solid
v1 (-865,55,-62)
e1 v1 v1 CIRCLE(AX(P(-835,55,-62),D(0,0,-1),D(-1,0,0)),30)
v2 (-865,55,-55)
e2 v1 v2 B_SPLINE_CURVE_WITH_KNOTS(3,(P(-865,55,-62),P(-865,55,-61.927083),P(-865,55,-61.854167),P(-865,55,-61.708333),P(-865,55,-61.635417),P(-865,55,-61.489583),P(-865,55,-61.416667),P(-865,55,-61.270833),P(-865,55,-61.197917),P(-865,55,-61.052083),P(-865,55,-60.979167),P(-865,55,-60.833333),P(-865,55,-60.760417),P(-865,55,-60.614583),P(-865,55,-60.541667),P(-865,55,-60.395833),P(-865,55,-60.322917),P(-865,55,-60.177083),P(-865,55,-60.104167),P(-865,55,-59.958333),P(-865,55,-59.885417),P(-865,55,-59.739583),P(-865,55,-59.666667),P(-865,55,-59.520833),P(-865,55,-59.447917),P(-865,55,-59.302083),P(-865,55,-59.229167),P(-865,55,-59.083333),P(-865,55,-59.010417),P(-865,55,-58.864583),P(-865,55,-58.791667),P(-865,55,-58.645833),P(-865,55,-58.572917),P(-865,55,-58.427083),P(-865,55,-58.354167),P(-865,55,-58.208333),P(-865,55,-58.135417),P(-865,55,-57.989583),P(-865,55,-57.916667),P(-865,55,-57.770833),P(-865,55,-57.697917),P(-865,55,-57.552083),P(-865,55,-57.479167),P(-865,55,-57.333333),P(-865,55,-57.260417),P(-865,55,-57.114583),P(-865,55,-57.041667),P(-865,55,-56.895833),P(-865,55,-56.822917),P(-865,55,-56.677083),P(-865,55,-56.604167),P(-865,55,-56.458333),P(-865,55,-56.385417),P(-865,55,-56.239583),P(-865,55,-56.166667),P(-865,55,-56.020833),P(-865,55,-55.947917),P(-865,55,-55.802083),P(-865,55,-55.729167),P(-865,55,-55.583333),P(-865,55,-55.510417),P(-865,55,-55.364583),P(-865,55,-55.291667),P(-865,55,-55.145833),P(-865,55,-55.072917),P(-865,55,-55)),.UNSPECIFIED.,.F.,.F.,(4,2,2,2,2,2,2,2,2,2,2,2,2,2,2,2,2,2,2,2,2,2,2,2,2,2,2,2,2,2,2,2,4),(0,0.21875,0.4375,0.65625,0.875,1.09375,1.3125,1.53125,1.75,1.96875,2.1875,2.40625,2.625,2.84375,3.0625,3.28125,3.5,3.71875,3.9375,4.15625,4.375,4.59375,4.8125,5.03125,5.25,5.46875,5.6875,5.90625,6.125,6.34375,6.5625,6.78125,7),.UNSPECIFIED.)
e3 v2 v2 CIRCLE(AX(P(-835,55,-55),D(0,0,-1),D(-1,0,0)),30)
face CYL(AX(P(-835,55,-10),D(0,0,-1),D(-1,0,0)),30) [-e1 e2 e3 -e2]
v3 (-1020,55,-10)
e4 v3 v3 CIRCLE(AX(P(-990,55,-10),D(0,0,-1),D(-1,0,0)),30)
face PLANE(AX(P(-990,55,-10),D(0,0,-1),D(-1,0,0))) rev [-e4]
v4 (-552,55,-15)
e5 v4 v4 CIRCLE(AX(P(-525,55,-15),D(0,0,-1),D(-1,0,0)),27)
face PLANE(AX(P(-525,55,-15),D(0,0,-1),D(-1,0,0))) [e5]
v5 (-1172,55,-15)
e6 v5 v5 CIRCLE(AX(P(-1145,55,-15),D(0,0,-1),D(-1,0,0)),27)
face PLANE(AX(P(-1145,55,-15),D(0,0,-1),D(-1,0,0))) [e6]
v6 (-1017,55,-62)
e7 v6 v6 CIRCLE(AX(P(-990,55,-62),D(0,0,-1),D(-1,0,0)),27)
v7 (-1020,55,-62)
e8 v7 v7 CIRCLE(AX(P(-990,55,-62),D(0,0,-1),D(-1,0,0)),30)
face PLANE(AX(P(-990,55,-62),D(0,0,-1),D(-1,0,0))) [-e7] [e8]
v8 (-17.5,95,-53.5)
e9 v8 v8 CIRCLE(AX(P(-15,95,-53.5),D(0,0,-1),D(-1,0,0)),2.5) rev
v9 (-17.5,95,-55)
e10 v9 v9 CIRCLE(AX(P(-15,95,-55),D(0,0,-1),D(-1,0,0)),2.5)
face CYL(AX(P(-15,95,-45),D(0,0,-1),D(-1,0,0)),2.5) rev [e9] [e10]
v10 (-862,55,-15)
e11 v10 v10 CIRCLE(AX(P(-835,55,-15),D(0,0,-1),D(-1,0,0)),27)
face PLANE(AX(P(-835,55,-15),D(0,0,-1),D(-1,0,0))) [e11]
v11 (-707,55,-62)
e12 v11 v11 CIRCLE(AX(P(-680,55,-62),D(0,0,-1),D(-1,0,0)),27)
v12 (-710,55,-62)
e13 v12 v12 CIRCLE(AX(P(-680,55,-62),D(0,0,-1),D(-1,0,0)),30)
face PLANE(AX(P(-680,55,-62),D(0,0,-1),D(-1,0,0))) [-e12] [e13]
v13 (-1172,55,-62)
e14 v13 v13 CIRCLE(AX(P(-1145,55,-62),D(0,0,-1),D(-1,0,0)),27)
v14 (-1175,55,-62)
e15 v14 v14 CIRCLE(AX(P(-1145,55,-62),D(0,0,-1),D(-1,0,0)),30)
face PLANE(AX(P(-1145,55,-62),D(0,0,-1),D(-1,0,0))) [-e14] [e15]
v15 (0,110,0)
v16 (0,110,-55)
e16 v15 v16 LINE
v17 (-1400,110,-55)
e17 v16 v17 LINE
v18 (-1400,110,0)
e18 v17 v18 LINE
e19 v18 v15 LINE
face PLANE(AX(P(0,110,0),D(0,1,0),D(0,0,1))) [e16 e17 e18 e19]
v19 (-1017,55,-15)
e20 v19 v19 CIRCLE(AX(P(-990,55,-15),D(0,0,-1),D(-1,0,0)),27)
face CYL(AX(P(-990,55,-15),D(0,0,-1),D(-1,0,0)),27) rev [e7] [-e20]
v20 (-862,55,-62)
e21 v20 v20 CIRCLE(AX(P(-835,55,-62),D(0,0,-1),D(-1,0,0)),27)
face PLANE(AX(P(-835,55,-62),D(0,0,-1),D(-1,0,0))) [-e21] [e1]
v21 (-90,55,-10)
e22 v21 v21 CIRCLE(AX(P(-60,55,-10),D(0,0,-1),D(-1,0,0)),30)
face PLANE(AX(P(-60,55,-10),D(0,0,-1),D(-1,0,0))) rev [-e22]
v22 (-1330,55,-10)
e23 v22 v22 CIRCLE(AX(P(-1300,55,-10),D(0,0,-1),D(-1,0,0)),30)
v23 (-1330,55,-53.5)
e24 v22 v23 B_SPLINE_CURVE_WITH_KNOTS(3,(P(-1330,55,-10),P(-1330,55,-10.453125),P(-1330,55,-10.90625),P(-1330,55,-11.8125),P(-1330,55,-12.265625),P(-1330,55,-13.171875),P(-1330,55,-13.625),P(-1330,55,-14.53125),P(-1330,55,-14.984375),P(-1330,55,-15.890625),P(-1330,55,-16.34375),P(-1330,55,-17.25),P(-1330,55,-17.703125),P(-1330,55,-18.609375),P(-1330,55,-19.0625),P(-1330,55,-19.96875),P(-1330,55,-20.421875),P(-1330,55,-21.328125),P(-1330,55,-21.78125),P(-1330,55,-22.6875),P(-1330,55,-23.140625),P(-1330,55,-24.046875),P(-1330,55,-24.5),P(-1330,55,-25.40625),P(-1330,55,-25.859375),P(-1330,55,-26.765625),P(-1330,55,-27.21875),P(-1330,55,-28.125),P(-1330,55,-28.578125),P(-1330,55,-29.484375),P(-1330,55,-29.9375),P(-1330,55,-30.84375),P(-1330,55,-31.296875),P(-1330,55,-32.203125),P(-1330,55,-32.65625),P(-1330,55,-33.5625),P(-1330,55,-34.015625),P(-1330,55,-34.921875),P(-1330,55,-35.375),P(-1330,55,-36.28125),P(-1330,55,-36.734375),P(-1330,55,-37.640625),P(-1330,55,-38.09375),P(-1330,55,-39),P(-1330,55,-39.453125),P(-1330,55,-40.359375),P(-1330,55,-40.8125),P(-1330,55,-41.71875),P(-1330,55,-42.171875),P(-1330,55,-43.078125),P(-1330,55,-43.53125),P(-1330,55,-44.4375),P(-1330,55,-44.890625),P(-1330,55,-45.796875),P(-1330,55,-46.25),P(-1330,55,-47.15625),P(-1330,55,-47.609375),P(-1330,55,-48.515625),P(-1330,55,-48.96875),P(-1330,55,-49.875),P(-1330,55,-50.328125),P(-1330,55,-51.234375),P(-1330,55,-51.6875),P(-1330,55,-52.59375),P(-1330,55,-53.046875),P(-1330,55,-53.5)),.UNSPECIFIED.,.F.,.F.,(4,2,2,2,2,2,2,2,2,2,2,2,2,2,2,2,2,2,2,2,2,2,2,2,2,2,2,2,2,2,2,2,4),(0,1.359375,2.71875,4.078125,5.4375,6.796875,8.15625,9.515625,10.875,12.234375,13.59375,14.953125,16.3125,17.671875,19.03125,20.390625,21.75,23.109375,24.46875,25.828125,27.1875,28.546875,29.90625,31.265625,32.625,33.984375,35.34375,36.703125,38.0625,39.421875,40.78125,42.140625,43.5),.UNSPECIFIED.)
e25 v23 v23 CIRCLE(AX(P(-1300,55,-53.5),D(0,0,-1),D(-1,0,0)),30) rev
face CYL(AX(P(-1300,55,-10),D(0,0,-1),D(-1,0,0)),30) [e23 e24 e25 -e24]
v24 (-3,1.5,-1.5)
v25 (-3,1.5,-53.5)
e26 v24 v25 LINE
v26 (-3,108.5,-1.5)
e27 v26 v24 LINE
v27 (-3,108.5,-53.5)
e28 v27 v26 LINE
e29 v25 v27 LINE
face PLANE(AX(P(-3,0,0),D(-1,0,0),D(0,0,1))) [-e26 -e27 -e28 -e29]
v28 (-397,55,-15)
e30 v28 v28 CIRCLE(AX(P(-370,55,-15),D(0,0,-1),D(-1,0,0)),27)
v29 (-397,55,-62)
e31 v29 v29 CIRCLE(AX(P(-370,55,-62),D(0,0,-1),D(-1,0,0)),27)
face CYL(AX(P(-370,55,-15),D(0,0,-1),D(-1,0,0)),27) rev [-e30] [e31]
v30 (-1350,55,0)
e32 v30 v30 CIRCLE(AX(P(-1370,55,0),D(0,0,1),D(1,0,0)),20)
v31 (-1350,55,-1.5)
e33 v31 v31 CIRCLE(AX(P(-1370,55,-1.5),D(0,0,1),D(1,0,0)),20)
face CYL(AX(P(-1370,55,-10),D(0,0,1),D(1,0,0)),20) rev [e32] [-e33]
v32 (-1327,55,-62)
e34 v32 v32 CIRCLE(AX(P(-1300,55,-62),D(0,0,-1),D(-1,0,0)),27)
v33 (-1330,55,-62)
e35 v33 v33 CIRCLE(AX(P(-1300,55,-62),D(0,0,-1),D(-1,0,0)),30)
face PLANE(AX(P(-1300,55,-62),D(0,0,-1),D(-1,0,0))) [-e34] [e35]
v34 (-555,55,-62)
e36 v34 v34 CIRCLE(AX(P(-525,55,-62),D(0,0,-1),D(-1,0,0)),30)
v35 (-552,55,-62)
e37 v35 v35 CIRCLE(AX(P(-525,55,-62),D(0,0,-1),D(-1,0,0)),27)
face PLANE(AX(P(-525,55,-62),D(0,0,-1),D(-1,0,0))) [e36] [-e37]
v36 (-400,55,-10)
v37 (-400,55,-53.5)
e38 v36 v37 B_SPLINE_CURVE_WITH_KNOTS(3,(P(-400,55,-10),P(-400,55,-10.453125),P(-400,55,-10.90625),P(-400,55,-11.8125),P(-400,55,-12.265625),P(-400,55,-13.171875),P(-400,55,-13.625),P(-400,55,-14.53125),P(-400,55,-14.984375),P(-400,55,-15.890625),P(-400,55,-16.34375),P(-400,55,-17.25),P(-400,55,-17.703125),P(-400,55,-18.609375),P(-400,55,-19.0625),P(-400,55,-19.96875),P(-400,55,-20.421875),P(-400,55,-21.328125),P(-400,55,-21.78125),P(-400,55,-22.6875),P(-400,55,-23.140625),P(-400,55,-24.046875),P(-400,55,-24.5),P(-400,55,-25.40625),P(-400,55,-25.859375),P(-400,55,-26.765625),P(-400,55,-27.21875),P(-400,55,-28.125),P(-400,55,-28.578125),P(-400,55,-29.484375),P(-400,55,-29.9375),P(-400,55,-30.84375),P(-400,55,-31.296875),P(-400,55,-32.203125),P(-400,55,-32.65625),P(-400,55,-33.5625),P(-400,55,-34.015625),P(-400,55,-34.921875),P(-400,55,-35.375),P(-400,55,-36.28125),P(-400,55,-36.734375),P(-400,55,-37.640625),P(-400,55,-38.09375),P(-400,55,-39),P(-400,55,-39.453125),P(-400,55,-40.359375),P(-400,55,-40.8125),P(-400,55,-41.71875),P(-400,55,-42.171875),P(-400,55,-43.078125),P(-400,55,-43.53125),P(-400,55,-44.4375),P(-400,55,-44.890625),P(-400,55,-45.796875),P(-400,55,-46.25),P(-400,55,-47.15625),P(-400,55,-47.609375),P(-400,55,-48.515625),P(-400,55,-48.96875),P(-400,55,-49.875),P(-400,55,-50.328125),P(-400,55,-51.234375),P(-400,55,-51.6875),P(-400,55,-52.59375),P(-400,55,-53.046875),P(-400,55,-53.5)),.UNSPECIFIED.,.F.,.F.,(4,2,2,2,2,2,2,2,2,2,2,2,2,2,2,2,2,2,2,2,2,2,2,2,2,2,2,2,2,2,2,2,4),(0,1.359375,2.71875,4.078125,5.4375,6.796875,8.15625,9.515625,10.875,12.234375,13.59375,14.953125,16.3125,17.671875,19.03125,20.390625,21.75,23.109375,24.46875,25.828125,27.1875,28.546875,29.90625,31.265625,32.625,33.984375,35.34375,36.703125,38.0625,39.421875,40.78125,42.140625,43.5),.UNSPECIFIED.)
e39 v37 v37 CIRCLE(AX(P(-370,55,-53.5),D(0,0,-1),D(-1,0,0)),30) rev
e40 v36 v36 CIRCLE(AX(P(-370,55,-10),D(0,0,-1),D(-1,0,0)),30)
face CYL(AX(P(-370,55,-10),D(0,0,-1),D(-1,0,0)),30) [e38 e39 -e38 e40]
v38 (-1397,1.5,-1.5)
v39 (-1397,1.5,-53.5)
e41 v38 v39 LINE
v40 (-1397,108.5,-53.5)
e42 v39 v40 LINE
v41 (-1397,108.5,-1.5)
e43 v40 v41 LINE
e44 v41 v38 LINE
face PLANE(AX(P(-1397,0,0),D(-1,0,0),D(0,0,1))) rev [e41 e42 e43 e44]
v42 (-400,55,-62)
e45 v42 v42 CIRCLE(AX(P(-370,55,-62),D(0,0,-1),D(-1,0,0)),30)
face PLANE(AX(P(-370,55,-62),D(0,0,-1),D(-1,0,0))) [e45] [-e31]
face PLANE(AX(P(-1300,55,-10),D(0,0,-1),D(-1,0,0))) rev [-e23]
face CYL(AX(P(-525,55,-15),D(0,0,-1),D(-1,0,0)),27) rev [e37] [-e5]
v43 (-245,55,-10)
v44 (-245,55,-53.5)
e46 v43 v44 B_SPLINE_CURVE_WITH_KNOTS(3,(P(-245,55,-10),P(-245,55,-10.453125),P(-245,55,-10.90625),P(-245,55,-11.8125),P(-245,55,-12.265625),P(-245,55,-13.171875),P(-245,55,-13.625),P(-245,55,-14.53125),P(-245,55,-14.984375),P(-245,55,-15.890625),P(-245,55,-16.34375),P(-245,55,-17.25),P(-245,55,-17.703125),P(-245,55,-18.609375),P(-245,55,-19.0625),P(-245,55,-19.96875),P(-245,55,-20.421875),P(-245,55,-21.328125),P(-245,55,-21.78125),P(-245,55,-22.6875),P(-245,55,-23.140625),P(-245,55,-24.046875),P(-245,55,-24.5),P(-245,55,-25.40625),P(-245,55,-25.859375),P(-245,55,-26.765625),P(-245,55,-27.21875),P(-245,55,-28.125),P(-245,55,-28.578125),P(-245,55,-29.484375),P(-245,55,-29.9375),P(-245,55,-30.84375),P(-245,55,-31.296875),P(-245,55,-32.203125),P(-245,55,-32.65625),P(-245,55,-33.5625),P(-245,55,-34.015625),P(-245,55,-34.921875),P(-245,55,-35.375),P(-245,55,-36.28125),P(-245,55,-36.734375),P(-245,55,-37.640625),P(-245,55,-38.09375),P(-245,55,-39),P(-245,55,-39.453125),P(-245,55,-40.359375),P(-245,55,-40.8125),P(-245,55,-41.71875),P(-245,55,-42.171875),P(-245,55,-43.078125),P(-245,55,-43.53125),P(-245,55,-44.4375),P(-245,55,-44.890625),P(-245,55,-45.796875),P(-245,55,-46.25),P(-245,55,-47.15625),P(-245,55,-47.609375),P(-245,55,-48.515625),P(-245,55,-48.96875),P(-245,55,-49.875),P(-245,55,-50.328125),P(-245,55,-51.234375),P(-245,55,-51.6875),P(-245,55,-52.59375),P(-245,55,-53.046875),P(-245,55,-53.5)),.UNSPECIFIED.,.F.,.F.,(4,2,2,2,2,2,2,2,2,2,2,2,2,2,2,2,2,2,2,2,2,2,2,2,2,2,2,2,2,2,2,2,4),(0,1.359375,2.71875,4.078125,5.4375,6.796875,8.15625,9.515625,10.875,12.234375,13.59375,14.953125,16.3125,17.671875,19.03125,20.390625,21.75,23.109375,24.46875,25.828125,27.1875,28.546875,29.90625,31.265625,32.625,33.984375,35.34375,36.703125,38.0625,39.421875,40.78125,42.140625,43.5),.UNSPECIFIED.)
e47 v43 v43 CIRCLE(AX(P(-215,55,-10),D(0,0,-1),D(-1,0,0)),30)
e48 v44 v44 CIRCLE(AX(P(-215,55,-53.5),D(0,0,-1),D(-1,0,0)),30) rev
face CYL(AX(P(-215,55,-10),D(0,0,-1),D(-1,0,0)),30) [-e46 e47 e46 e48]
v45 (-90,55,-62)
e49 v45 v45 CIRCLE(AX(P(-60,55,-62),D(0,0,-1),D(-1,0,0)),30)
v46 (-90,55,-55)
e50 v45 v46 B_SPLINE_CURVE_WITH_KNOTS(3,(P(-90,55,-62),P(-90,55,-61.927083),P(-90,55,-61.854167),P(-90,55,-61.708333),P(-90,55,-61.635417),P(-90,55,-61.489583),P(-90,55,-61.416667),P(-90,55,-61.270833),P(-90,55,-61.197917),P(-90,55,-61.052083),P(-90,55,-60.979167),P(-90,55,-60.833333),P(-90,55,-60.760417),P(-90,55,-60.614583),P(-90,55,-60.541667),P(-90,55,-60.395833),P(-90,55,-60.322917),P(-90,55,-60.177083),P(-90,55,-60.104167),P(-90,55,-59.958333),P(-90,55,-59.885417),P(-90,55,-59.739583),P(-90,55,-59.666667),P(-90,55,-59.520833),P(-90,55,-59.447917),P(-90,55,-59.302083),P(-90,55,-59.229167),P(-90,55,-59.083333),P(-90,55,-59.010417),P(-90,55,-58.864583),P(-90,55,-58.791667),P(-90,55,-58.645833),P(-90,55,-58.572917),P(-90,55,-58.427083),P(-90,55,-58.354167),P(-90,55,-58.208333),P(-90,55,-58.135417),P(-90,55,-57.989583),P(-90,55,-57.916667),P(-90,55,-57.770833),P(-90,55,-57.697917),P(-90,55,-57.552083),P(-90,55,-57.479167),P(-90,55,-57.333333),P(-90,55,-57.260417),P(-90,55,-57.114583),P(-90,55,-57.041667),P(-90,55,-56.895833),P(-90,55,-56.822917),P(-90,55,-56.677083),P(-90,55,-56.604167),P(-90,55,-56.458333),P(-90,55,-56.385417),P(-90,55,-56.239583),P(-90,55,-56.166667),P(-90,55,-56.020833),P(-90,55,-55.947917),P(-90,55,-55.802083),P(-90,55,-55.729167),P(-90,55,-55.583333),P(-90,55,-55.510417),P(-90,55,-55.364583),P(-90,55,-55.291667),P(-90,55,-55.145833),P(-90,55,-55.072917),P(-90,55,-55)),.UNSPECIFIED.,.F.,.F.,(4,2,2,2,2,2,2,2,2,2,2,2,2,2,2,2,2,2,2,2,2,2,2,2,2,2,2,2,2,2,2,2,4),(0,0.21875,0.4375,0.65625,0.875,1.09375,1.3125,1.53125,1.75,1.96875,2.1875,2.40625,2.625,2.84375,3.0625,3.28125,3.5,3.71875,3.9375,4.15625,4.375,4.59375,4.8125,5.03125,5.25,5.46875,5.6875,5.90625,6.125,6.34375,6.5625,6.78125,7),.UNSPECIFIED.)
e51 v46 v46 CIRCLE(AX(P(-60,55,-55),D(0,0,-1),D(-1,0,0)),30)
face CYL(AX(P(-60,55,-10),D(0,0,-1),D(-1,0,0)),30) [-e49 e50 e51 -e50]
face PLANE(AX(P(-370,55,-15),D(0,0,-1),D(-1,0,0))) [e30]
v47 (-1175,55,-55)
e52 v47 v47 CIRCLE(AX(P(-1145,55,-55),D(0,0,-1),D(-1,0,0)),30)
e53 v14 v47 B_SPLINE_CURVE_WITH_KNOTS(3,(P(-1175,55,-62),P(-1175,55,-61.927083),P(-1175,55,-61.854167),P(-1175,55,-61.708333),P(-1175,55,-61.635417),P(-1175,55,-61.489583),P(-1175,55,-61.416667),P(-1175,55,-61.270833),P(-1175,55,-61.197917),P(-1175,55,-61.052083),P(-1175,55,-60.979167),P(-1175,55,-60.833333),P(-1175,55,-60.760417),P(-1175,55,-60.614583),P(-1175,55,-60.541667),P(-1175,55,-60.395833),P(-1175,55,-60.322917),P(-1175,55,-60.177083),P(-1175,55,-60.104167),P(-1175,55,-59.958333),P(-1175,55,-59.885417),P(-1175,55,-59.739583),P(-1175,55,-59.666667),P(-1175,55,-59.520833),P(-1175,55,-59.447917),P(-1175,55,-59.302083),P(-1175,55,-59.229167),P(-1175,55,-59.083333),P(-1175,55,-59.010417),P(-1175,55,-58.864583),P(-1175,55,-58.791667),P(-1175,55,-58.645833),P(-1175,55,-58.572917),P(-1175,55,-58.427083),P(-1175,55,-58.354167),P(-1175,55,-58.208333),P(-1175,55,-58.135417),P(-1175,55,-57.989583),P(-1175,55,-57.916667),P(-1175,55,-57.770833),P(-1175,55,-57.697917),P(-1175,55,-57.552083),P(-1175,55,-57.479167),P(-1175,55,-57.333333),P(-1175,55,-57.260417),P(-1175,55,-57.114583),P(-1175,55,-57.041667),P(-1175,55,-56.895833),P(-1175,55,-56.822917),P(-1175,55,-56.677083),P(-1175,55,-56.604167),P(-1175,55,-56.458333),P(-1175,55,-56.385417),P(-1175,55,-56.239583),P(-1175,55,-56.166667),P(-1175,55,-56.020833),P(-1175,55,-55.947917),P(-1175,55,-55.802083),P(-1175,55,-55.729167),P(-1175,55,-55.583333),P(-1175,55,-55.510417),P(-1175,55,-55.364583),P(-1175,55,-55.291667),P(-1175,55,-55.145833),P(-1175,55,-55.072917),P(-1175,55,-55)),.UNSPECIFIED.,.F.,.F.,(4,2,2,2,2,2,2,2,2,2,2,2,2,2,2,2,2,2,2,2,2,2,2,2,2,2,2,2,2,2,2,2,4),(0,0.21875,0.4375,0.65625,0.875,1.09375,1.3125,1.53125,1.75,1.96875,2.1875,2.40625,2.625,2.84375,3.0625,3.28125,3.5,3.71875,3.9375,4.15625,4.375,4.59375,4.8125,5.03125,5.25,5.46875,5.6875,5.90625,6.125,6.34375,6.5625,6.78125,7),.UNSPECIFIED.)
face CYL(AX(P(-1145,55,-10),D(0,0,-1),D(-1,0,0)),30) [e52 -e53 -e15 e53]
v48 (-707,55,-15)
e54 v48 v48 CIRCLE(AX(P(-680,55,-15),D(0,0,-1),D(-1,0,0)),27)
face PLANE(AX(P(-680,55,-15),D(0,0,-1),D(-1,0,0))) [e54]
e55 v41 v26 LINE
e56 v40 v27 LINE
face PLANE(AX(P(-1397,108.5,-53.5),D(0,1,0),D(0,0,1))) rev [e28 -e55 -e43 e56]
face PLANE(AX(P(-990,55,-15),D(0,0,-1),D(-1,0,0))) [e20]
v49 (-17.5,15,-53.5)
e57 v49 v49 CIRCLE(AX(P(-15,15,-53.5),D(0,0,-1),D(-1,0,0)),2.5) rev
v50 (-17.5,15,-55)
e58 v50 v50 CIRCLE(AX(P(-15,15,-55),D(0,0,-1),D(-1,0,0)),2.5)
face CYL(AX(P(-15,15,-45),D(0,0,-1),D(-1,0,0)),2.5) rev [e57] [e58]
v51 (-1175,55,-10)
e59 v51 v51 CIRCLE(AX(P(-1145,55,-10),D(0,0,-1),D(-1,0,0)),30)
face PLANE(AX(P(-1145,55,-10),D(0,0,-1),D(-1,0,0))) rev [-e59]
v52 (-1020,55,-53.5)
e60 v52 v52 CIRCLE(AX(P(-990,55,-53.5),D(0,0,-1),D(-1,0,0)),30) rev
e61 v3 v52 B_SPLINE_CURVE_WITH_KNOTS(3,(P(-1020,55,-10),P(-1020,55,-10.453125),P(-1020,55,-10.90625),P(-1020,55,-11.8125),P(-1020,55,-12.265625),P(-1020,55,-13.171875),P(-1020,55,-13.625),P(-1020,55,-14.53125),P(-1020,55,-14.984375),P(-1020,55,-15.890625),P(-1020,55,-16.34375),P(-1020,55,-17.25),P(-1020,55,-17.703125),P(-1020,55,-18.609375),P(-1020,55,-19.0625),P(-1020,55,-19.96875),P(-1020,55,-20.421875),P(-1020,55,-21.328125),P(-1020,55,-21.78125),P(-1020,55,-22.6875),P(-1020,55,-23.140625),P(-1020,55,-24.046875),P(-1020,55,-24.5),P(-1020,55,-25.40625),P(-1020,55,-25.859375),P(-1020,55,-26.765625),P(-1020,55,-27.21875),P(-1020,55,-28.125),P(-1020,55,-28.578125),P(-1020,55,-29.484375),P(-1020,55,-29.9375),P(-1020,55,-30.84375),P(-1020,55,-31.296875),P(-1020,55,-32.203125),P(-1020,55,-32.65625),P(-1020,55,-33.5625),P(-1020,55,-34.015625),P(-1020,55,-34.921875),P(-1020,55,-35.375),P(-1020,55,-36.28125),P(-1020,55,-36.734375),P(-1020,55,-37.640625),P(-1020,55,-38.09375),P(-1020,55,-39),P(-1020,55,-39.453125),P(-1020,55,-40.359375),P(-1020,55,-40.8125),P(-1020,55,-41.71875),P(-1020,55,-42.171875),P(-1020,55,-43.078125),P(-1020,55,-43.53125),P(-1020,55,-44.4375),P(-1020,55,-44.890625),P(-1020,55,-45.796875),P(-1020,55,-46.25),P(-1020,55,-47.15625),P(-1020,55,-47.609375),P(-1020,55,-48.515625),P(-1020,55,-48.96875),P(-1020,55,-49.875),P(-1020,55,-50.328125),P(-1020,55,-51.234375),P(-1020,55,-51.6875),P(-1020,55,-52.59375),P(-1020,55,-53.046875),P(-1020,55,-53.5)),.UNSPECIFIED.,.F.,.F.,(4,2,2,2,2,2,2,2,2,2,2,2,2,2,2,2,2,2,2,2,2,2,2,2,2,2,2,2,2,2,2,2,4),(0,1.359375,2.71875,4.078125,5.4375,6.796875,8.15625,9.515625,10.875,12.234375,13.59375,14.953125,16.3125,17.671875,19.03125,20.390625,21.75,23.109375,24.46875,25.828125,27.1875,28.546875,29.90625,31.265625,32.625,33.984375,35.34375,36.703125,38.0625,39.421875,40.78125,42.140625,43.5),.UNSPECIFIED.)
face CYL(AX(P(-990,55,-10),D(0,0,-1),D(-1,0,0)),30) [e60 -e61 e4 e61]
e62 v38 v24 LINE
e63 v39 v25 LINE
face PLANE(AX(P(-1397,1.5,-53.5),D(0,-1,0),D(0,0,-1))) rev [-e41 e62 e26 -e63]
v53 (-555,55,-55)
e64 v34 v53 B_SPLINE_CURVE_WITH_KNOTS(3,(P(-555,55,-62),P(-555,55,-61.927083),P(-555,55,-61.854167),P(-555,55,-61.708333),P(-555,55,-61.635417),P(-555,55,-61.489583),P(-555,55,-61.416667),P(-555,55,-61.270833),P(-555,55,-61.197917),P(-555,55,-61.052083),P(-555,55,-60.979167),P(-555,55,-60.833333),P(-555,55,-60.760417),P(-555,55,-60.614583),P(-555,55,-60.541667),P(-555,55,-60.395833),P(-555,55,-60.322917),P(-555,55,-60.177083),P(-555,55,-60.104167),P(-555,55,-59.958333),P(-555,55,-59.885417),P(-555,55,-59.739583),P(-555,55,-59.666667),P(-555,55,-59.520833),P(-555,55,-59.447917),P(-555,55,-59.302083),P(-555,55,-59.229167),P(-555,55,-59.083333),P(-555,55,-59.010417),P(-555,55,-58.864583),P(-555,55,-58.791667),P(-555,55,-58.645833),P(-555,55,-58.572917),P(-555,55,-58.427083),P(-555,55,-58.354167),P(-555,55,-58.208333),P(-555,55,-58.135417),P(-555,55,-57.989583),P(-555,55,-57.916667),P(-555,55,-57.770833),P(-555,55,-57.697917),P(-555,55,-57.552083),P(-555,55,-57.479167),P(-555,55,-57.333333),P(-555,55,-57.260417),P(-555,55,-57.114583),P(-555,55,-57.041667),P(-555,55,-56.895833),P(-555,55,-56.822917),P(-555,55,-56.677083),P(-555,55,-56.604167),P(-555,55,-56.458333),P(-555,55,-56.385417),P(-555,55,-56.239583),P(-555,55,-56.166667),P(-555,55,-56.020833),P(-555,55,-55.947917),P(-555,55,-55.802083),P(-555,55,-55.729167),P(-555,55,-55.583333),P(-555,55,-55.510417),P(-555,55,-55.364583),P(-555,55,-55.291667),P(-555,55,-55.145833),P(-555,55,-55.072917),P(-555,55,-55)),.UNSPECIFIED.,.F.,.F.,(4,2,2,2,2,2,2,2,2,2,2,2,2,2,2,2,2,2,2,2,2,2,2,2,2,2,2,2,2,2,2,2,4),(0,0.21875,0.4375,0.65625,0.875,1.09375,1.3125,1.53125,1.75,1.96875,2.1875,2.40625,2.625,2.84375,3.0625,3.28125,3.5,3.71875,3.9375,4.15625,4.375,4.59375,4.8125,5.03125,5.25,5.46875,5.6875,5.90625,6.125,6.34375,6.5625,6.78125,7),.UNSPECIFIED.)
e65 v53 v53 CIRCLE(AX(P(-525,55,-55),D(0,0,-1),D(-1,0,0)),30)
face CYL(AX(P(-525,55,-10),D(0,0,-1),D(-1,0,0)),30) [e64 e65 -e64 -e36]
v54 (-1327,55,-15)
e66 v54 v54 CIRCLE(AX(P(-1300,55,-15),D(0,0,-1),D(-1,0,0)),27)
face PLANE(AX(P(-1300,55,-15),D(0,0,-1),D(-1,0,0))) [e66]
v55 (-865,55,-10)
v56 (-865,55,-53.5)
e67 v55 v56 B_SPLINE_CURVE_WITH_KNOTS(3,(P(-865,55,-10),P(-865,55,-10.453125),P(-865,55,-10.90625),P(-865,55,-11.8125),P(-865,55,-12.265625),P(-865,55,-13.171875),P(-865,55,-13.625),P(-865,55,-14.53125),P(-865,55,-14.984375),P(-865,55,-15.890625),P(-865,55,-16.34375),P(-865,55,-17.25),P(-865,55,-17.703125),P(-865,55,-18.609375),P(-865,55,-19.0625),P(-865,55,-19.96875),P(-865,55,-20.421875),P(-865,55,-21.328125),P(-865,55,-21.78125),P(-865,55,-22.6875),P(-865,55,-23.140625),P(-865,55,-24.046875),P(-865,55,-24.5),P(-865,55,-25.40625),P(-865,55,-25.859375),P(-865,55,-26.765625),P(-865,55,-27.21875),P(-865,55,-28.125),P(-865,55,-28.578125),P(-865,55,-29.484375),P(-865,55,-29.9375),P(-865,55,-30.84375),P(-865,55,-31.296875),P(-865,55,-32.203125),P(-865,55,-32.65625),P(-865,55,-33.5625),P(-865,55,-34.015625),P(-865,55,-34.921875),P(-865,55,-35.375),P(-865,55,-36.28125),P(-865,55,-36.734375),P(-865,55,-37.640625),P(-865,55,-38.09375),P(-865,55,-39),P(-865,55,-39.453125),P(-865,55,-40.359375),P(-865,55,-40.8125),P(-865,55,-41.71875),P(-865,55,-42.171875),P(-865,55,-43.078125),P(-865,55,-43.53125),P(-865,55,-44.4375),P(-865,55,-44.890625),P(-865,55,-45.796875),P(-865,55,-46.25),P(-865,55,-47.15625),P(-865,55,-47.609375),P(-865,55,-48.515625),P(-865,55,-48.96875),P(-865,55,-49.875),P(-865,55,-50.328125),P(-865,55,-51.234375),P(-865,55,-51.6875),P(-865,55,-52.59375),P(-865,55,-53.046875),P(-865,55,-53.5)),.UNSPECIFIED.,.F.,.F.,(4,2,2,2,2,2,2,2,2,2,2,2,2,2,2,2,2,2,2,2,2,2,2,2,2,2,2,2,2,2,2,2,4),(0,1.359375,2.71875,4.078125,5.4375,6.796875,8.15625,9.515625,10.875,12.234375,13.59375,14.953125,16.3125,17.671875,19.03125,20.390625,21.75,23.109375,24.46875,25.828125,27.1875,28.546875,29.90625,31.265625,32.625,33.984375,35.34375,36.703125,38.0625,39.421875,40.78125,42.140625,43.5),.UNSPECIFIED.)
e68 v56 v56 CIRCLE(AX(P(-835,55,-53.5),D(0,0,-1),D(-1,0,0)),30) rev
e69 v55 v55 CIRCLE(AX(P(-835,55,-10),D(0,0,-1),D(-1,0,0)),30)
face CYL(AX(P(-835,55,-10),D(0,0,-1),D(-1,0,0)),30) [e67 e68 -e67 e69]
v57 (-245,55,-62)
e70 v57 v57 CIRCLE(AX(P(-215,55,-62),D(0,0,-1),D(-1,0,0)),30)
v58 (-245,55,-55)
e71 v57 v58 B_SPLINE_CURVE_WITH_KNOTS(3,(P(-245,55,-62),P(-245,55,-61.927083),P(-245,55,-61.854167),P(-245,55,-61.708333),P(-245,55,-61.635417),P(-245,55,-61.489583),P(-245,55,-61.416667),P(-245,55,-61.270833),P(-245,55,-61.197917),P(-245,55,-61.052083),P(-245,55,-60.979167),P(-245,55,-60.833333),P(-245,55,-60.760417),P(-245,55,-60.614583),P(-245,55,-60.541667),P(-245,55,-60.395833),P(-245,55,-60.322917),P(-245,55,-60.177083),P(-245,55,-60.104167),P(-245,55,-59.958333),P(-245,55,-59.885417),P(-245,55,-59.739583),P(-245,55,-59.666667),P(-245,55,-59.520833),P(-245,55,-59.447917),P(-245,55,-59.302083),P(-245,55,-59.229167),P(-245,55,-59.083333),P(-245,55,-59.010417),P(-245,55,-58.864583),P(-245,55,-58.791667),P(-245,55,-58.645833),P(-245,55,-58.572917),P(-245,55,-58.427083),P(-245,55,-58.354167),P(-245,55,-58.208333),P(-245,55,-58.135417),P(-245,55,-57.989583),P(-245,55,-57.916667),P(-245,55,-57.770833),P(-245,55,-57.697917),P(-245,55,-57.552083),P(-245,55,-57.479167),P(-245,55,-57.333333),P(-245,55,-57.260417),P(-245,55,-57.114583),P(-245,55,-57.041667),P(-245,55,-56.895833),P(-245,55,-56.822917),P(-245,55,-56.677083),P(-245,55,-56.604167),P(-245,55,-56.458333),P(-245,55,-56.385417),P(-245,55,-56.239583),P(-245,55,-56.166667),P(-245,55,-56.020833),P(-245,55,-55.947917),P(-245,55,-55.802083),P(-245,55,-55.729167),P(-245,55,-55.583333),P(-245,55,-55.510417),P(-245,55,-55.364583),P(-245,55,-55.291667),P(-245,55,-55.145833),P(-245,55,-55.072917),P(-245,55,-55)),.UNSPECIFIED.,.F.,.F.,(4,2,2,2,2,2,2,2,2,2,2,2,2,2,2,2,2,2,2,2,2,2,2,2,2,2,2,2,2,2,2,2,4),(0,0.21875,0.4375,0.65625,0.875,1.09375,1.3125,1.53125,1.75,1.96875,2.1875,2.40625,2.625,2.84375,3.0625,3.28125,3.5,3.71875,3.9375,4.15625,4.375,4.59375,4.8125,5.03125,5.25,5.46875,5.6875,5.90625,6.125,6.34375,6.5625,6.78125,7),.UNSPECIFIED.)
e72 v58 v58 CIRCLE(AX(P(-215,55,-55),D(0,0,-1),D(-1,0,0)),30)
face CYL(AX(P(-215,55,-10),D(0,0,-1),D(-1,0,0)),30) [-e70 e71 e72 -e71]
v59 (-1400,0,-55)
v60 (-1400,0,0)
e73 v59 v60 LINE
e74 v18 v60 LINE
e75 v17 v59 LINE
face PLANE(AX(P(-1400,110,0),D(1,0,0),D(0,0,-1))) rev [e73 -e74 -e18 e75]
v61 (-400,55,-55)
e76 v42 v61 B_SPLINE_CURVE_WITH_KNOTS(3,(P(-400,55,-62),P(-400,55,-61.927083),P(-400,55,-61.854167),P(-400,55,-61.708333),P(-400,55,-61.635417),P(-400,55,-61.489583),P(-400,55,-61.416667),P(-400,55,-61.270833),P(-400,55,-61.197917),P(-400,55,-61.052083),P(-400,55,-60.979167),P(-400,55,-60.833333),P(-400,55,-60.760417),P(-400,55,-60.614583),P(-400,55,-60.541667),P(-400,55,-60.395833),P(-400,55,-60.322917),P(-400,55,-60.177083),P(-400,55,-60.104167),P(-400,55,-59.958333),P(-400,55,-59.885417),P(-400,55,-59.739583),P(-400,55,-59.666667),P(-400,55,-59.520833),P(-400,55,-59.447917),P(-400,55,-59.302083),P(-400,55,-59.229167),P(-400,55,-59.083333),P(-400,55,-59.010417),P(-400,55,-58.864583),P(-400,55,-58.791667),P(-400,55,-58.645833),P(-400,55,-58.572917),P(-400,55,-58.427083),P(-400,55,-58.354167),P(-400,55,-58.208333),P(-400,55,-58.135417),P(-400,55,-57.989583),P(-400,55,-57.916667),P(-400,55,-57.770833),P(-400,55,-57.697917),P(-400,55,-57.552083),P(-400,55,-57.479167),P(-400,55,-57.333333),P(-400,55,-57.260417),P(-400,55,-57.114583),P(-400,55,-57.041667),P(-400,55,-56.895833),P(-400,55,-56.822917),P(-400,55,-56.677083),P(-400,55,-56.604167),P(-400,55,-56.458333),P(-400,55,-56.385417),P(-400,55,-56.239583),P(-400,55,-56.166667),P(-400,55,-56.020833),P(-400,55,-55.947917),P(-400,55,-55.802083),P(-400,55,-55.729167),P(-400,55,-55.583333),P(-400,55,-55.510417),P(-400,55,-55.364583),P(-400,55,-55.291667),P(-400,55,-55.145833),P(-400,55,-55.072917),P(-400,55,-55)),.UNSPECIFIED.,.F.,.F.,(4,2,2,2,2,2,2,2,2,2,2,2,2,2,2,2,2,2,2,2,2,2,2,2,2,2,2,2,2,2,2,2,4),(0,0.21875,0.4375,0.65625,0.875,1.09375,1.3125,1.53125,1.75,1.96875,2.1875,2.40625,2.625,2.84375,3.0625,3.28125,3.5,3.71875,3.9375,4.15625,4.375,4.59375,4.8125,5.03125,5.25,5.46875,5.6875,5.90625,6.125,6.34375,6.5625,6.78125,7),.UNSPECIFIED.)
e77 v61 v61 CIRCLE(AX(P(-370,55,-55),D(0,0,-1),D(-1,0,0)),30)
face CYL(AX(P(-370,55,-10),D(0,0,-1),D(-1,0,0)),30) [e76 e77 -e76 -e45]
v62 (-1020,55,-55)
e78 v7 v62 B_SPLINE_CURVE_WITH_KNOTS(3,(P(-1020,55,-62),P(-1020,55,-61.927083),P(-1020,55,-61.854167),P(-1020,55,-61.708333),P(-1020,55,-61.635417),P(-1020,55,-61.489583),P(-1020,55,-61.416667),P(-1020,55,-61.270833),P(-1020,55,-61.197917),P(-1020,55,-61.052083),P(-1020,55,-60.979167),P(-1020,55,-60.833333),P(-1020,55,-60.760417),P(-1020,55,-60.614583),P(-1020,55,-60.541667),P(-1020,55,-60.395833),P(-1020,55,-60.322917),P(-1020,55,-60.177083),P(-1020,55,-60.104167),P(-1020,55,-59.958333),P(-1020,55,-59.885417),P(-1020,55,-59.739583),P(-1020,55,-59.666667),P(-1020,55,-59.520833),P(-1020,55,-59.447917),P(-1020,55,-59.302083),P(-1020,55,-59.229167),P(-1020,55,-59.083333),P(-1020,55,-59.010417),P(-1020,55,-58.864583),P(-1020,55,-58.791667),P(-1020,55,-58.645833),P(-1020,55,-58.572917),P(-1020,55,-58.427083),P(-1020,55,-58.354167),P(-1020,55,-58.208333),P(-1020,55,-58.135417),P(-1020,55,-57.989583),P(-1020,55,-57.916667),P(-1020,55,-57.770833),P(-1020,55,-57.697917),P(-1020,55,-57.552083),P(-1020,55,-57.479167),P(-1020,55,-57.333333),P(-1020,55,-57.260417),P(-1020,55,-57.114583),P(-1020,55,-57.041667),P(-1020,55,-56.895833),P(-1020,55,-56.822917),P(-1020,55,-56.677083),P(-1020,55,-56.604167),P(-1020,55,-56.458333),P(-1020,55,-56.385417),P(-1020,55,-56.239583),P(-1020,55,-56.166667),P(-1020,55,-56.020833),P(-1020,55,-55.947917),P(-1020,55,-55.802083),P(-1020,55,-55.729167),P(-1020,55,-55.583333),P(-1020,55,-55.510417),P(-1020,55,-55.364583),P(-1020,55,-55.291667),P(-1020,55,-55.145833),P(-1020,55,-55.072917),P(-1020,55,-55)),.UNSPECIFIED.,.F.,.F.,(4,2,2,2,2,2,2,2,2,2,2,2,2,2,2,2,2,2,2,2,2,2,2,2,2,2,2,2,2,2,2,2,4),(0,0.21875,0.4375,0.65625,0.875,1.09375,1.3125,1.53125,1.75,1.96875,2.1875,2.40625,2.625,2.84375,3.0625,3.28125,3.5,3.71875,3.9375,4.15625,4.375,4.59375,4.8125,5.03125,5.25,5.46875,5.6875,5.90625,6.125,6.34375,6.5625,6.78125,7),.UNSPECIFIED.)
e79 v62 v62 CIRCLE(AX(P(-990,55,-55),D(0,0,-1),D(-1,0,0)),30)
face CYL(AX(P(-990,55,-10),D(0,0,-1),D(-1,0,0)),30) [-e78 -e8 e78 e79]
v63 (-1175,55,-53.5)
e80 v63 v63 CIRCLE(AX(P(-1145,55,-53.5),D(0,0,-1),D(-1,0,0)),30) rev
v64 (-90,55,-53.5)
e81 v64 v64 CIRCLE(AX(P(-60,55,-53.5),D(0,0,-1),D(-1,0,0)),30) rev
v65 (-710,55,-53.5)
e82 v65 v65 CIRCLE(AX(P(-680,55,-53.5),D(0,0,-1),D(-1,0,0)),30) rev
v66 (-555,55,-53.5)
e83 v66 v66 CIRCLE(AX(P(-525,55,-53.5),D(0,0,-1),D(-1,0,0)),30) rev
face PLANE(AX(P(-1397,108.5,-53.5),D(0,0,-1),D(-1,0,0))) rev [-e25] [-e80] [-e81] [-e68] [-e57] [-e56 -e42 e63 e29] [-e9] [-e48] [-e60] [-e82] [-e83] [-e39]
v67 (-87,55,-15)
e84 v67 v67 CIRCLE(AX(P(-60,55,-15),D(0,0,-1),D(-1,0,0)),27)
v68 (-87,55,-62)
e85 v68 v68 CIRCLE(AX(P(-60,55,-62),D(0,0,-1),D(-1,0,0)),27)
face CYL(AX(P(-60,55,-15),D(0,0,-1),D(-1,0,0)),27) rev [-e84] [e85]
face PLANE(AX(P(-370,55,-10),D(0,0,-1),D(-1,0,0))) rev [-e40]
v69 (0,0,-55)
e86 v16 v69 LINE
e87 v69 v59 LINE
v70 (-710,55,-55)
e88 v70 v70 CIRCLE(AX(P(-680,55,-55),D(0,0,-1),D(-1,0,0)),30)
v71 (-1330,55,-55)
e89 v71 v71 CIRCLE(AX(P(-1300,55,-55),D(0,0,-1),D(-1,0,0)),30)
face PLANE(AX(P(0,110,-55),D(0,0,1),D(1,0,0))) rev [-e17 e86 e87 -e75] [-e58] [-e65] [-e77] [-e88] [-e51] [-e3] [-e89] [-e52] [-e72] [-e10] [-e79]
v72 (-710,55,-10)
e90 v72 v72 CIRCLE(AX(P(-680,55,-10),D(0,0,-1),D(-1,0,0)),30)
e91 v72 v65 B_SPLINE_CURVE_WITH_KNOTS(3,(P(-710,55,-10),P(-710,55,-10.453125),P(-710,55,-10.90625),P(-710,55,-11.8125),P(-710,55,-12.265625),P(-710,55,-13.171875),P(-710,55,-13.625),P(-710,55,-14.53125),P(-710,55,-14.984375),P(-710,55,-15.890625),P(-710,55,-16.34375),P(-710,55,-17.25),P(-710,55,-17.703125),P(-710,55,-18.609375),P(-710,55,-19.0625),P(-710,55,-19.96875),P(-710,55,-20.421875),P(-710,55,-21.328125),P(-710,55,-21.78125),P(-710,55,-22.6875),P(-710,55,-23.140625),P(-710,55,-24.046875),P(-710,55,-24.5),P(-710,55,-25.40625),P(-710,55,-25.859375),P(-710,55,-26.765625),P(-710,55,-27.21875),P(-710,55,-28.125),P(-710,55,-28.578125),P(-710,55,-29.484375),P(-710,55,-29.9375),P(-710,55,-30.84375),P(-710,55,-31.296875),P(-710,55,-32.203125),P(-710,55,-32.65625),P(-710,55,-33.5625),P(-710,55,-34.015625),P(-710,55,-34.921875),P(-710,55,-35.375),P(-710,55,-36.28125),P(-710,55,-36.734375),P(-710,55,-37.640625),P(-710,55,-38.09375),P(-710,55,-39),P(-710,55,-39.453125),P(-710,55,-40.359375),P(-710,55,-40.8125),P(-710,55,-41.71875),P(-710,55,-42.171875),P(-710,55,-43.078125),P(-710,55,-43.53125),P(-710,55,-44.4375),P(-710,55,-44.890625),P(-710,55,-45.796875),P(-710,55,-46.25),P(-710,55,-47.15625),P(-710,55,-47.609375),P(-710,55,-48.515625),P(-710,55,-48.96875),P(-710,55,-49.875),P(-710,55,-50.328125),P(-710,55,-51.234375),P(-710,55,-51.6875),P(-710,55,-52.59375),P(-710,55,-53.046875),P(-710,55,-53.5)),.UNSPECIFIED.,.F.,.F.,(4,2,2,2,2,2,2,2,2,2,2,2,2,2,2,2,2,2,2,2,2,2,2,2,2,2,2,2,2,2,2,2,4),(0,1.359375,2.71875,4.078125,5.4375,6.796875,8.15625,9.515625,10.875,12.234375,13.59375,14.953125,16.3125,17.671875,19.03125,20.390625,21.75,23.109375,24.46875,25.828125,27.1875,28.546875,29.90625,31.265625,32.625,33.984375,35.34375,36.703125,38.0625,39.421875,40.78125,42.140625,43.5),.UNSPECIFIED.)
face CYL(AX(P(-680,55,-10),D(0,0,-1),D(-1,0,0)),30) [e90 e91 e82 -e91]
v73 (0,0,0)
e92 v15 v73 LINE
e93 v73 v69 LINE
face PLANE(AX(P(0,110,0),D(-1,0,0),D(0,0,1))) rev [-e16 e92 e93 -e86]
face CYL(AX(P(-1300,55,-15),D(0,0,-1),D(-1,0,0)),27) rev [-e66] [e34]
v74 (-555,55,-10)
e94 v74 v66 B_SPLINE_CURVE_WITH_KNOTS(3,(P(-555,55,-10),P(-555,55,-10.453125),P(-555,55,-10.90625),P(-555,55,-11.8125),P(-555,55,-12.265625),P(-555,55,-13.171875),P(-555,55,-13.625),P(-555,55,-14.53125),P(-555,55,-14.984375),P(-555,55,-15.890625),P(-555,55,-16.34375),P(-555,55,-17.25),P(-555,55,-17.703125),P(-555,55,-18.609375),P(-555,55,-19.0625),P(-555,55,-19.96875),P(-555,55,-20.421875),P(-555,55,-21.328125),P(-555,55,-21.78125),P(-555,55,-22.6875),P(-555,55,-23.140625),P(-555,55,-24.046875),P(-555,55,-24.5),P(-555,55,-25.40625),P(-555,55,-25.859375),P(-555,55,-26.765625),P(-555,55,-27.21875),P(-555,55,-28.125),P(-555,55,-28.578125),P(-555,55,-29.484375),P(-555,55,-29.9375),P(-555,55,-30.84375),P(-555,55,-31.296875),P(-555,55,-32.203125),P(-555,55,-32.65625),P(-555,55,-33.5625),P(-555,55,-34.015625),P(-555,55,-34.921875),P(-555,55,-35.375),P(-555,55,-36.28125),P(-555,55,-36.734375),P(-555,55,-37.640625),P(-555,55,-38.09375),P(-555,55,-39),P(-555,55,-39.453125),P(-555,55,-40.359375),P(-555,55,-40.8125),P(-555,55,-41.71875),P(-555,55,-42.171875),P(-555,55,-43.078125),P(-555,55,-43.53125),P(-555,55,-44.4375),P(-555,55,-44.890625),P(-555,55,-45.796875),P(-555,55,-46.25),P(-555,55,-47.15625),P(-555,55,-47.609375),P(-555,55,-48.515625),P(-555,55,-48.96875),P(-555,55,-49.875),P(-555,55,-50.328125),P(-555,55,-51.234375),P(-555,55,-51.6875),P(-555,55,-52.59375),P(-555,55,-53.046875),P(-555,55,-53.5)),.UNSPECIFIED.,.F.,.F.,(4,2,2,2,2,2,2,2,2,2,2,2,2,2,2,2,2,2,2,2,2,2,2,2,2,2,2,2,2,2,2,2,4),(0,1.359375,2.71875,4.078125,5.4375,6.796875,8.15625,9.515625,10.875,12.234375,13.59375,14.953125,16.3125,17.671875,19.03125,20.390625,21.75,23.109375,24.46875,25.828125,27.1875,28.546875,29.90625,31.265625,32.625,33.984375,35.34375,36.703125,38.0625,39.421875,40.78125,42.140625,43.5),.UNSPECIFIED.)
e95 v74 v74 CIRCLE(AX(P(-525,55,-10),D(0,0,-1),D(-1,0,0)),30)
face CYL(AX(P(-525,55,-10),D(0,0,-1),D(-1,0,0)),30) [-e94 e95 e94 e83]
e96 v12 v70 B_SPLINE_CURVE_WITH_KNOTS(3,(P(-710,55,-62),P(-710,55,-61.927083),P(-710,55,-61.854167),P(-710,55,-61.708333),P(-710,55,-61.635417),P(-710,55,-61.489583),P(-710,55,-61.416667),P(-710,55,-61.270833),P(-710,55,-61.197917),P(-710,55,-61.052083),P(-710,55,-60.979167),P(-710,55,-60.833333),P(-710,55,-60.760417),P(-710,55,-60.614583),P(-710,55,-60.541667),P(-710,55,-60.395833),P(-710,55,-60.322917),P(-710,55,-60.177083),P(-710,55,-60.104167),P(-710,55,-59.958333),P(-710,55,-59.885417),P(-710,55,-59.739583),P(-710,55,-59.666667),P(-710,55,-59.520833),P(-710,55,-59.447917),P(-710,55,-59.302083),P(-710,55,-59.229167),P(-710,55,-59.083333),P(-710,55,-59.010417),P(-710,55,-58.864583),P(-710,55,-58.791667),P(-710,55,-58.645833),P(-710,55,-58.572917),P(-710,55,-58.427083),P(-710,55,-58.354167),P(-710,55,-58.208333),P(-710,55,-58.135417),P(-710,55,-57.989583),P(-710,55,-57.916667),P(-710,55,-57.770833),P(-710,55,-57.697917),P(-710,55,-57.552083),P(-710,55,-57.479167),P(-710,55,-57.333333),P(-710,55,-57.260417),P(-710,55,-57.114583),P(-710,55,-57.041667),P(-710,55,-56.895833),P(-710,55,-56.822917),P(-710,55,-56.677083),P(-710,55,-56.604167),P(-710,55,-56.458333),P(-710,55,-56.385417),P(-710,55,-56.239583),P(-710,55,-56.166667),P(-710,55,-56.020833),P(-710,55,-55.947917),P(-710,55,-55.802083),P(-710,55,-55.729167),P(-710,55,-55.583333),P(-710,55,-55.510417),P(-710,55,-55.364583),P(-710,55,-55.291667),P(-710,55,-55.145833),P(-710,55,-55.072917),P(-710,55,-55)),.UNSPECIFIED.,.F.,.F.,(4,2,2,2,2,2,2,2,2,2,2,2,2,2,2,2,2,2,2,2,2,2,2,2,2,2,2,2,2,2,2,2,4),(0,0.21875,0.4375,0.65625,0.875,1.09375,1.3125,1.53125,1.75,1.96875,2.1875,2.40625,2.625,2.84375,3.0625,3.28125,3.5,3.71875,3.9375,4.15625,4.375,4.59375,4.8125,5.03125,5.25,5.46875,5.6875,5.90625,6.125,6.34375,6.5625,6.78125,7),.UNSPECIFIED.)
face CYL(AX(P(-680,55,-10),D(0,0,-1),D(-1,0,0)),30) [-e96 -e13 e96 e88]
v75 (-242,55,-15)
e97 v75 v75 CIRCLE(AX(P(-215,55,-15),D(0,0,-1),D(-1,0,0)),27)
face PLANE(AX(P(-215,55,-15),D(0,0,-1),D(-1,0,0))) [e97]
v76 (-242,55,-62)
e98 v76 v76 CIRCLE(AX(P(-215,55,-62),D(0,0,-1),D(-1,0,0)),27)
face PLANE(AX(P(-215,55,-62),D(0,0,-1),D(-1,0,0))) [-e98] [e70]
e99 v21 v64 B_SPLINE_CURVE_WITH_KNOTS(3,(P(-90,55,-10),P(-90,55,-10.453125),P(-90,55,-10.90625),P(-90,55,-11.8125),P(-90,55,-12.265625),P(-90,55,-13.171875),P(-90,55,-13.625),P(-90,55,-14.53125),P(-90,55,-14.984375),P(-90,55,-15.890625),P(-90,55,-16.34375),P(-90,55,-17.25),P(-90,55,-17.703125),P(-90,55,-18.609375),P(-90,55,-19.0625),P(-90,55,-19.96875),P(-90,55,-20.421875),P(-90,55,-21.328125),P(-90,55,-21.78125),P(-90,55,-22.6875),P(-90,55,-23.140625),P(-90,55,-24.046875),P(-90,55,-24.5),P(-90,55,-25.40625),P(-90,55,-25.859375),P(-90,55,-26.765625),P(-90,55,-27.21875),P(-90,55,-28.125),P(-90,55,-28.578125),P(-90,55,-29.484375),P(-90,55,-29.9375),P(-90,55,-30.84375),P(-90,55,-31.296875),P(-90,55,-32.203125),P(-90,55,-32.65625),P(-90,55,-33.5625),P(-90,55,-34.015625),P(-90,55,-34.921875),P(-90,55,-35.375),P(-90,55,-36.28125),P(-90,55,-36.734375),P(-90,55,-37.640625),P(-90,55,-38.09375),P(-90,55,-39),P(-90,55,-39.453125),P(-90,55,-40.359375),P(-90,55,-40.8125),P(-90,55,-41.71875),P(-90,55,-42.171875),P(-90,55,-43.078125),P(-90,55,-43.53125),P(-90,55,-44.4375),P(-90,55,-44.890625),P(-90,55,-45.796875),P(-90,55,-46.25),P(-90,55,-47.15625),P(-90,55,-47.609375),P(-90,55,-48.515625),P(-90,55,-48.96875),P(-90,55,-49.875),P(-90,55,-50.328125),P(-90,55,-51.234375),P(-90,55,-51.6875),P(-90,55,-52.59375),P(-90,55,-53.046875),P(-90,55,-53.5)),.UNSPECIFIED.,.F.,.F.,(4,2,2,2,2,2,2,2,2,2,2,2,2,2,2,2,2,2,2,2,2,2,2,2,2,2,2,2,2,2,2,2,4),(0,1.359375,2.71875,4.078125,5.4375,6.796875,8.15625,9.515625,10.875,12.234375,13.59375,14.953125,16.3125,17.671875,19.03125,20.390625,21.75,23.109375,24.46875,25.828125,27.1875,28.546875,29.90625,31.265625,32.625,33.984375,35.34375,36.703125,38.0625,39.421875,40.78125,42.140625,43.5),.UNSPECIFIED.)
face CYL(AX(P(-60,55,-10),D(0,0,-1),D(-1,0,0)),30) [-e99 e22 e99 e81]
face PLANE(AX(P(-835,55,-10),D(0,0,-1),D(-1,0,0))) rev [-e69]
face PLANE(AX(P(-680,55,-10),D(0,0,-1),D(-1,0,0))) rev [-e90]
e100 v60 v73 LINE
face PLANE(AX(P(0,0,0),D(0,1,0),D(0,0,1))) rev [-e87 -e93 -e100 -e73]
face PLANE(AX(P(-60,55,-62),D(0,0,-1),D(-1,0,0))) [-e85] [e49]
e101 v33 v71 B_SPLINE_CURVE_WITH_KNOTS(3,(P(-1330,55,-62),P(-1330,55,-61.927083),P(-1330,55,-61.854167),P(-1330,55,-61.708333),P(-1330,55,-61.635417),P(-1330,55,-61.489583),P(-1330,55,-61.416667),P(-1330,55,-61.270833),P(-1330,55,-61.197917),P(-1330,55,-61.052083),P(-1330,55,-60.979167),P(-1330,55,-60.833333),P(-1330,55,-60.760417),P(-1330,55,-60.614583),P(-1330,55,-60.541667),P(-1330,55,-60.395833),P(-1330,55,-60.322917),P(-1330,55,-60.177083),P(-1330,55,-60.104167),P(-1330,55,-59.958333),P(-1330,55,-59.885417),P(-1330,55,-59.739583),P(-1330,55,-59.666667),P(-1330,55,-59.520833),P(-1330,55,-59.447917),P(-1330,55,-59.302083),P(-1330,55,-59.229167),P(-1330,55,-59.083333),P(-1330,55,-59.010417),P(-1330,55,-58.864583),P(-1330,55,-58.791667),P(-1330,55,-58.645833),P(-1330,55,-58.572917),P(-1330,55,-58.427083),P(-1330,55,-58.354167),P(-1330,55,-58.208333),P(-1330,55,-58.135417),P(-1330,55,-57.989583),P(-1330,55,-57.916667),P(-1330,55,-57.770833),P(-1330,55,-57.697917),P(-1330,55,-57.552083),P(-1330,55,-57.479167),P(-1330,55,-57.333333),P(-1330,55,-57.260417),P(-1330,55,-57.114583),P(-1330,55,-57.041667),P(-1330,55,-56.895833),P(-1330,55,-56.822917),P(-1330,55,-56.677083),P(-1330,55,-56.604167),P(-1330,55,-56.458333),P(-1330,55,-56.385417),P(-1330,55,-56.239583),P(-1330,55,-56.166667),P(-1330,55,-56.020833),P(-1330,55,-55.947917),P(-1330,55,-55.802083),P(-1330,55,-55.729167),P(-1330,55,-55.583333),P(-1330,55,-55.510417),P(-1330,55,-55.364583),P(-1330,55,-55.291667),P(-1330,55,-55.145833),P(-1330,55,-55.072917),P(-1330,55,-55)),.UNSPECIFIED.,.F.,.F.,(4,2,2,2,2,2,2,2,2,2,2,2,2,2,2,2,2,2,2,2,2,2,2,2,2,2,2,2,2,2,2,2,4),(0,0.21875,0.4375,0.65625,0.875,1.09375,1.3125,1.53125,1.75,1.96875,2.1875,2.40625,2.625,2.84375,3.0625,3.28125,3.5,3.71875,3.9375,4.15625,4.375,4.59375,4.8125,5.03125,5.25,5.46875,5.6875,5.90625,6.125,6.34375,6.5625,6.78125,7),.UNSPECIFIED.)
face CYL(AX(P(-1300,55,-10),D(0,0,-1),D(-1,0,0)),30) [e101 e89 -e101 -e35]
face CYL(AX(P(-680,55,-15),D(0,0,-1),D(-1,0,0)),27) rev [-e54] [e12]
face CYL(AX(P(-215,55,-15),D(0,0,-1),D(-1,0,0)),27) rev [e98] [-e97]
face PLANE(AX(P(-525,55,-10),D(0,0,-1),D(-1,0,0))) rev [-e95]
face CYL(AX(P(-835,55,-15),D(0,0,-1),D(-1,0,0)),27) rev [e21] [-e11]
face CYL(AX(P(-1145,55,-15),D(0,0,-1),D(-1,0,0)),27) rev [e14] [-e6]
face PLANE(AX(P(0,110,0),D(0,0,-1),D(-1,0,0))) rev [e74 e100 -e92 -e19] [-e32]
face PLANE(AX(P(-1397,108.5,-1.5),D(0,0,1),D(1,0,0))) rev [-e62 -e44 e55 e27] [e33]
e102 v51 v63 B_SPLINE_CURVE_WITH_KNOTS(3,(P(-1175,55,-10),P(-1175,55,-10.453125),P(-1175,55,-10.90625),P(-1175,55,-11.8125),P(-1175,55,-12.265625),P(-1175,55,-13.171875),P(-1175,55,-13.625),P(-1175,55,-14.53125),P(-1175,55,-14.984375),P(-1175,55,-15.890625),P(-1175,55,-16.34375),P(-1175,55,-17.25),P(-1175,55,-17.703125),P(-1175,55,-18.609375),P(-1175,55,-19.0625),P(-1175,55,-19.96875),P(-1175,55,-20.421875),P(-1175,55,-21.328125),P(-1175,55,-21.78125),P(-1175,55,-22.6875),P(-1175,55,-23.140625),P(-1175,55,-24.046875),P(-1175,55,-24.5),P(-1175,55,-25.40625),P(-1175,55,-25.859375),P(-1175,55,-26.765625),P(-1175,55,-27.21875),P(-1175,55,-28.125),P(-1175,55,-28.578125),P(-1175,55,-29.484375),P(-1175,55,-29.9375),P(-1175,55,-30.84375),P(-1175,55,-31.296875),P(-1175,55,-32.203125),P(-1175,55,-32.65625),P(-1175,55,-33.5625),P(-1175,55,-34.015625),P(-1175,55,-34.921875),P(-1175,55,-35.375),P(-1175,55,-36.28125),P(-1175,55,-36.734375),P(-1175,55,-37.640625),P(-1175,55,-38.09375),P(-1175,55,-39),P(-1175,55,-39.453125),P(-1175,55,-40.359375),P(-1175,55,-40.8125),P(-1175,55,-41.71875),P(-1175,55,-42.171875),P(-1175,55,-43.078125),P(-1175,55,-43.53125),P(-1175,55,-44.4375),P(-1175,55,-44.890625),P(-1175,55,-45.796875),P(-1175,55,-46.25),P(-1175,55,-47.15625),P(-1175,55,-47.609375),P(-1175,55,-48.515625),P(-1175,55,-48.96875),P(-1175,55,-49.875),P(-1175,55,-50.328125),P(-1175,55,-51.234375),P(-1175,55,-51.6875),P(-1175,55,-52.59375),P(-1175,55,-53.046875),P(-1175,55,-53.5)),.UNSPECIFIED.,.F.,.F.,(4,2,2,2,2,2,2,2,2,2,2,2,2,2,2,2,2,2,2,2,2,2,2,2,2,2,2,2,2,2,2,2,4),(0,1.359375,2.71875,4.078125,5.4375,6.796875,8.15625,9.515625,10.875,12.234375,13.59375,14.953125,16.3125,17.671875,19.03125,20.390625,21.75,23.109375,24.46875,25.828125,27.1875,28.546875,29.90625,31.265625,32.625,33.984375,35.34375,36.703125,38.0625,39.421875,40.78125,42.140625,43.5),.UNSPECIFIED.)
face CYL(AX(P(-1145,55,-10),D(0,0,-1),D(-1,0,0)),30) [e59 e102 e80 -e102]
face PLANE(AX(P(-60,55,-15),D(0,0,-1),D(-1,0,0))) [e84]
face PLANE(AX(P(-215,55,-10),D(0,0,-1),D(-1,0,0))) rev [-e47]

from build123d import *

# Parameters (mm, degrees)
SKETCH_1_W                = 1400
SKETCH_1_H                = 55
EXTRUDE_1_DEPTH           = 110
CUT_EXTRUDE_START         = -10
CUT_EXTRUDE_1_OUTLINE_R   = 30
CUT_EXTRUDE_1_OUTLINE_R_2 = 2.5
CUT_EXTRUDE_1_DEPTH       = 10
CUT_EXTRUDE_START_2       = -3
SKETCH_4_W                = 52
SKETCH_4_H                = 107
CUT_EXTRUDE_2_DEPTH       = 1394
SKETCH_5_R                = 20
CUT_EXTRUDE_3_DEPTH       = 10
EXTRUDE_START             = -45
SKETCH_7_R                = 30
EXTRUDE_2_DEPTH           = 52
SKETCH_8_R                = 27
CUT_EXTRUDE_4_DEPTH       = 47
PATTERN_LINEAR_1_COUNT    = 10
PATTERN_LINEAR_1_PITCH    = 155


# Read off the part's stored shape, not the designer's step: Вырез-Вытянуть1
with BuildPart() as part:
    # Эскиз1 → Бобышка-Вытянуть1 (new body)
    with BuildSketch(Plane(origin=(0, 0, 0), x_dir=(1, 0, 0), z_dir=(0, 1, 0))):
        with Locations((-700, 27.5)):
            Rectangle(SKETCH_1_W, SKETCH_1_H)
    extrude(amount=EXTRUDE_1_DEPTH)

    # Вырез-Вытянуть1 outline → Вырез-Вытянуть1 (cut)
    with BuildSketch(Plane(origin=(0, 0, -55), x_dir=(-1, 0, 0), z_dir=(0, 0, -1)).offset(CUT_EXTRUDE_START)):
        with Locations((60, 55)):
            Circle(CUT_EXTRUDE_1_OUTLINE_R)
        with Locations((15, 95)):
            Circle(CUT_EXTRUDE_1_OUTLINE_R_2)
        with Locations((1300, 55)):
            Circle(CUT_EXTRUDE_1_OUTLINE_R)
        with Locations((1145, 55)):
            Circle(CUT_EXTRUDE_1_OUTLINE_R)
        with Locations((990, 55)):
            Circle(CUT_EXTRUDE_1_OUTLINE_R)
        with Locations((835, 55)):
            Circle(CUT_EXTRUDE_1_OUTLINE_R)
        with Locations((680, 55)):
            Circle(CUT_EXTRUDE_1_OUTLINE_R)
        with Locations((525, 55)):
            Circle(CUT_EXTRUDE_1_OUTLINE_R)
        with Locations((370, 55)):
            Circle(CUT_EXTRUDE_1_OUTLINE_R)
        with Locations((215, 55)):
            Circle(CUT_EXTRUDE_1_OUTLINE_R)
        with Locations((15, 15)):
            Circle(CUT_EXTRUDE_1_OUTLINE_R_2)
    extrude(amount=CUT_EXTRUDE_1_DEPTH, mode=Mode.SUBTRACT)

    # Эскиз4 → Вырез-Вытянуть2 (cut)
    with BuildSketch(Plane(origin=(0, 0, 0), x_dir=(0, 0, -1), z_dir=(1, 0, 0)).offset(CUT_EXTRUDE_START_2)):
        with Locations((27.5, 55)):
            Rectangle(SKETCH_4_W, SKETCH_4_H)
    extrude(amount=-CUT_EXTRUDE_2_DEPTH, mode=Mode.SUBTRACT)

    # Эскиз5 → Вырез-Вытянуть3 (cut)
    with BuildSketch(Plane.XY):
        with Locations((-1370, 55)):
            Circle(SKETCH_5_R)
    extrude(amount=-CUT_EXTRUDE_3_DEPTH, mode=Mode.SUBTRACT)

    # Эскиз7 → Бобышка-Вытянуть2 (add)
    with BuildSketch(Plane(origin=(0, 0, -55), x_dir=(-1, 0, 0), z_dir=(0, 0, -1)).offset(EXTRUDE_START)):
        with Locations((60, 55)):
            Circle(SKETCH_7_R)
    extrude_2 = extrude(amount=EXTRUDE_2_DEPTH)

    # Эскиз8 → Вырез-Вытянуть4 (cut)
    with BuildSketch(Plane(origin=(0, 0, -62), x_dir=(-1, 0, 0), z_dir=(0, 0, -1))):
        with Locations((60, 55)):
            Circle(SKETCH_8_R)
    cut_extrude_4 = extrude(amount=-CUT_EXTRUDE_4_DEPTH, mode=Mode.SUBTRACT)

    # Линейный массив1: Бобышка-Вытянуть2, Вырез-Вытянуть4 ×10, 1 skipped
    with Locations(*[(-i * PATTERN_LINEAR_1_PITCH, 0, 0) for i in range(1, PATTERN_LINEAR_1_COUNT) if i not in (9,)]):
        add(extrude_2)
        add(cut_extrude_4, mode=Mode.SUBTRACT)


solid = part.part
